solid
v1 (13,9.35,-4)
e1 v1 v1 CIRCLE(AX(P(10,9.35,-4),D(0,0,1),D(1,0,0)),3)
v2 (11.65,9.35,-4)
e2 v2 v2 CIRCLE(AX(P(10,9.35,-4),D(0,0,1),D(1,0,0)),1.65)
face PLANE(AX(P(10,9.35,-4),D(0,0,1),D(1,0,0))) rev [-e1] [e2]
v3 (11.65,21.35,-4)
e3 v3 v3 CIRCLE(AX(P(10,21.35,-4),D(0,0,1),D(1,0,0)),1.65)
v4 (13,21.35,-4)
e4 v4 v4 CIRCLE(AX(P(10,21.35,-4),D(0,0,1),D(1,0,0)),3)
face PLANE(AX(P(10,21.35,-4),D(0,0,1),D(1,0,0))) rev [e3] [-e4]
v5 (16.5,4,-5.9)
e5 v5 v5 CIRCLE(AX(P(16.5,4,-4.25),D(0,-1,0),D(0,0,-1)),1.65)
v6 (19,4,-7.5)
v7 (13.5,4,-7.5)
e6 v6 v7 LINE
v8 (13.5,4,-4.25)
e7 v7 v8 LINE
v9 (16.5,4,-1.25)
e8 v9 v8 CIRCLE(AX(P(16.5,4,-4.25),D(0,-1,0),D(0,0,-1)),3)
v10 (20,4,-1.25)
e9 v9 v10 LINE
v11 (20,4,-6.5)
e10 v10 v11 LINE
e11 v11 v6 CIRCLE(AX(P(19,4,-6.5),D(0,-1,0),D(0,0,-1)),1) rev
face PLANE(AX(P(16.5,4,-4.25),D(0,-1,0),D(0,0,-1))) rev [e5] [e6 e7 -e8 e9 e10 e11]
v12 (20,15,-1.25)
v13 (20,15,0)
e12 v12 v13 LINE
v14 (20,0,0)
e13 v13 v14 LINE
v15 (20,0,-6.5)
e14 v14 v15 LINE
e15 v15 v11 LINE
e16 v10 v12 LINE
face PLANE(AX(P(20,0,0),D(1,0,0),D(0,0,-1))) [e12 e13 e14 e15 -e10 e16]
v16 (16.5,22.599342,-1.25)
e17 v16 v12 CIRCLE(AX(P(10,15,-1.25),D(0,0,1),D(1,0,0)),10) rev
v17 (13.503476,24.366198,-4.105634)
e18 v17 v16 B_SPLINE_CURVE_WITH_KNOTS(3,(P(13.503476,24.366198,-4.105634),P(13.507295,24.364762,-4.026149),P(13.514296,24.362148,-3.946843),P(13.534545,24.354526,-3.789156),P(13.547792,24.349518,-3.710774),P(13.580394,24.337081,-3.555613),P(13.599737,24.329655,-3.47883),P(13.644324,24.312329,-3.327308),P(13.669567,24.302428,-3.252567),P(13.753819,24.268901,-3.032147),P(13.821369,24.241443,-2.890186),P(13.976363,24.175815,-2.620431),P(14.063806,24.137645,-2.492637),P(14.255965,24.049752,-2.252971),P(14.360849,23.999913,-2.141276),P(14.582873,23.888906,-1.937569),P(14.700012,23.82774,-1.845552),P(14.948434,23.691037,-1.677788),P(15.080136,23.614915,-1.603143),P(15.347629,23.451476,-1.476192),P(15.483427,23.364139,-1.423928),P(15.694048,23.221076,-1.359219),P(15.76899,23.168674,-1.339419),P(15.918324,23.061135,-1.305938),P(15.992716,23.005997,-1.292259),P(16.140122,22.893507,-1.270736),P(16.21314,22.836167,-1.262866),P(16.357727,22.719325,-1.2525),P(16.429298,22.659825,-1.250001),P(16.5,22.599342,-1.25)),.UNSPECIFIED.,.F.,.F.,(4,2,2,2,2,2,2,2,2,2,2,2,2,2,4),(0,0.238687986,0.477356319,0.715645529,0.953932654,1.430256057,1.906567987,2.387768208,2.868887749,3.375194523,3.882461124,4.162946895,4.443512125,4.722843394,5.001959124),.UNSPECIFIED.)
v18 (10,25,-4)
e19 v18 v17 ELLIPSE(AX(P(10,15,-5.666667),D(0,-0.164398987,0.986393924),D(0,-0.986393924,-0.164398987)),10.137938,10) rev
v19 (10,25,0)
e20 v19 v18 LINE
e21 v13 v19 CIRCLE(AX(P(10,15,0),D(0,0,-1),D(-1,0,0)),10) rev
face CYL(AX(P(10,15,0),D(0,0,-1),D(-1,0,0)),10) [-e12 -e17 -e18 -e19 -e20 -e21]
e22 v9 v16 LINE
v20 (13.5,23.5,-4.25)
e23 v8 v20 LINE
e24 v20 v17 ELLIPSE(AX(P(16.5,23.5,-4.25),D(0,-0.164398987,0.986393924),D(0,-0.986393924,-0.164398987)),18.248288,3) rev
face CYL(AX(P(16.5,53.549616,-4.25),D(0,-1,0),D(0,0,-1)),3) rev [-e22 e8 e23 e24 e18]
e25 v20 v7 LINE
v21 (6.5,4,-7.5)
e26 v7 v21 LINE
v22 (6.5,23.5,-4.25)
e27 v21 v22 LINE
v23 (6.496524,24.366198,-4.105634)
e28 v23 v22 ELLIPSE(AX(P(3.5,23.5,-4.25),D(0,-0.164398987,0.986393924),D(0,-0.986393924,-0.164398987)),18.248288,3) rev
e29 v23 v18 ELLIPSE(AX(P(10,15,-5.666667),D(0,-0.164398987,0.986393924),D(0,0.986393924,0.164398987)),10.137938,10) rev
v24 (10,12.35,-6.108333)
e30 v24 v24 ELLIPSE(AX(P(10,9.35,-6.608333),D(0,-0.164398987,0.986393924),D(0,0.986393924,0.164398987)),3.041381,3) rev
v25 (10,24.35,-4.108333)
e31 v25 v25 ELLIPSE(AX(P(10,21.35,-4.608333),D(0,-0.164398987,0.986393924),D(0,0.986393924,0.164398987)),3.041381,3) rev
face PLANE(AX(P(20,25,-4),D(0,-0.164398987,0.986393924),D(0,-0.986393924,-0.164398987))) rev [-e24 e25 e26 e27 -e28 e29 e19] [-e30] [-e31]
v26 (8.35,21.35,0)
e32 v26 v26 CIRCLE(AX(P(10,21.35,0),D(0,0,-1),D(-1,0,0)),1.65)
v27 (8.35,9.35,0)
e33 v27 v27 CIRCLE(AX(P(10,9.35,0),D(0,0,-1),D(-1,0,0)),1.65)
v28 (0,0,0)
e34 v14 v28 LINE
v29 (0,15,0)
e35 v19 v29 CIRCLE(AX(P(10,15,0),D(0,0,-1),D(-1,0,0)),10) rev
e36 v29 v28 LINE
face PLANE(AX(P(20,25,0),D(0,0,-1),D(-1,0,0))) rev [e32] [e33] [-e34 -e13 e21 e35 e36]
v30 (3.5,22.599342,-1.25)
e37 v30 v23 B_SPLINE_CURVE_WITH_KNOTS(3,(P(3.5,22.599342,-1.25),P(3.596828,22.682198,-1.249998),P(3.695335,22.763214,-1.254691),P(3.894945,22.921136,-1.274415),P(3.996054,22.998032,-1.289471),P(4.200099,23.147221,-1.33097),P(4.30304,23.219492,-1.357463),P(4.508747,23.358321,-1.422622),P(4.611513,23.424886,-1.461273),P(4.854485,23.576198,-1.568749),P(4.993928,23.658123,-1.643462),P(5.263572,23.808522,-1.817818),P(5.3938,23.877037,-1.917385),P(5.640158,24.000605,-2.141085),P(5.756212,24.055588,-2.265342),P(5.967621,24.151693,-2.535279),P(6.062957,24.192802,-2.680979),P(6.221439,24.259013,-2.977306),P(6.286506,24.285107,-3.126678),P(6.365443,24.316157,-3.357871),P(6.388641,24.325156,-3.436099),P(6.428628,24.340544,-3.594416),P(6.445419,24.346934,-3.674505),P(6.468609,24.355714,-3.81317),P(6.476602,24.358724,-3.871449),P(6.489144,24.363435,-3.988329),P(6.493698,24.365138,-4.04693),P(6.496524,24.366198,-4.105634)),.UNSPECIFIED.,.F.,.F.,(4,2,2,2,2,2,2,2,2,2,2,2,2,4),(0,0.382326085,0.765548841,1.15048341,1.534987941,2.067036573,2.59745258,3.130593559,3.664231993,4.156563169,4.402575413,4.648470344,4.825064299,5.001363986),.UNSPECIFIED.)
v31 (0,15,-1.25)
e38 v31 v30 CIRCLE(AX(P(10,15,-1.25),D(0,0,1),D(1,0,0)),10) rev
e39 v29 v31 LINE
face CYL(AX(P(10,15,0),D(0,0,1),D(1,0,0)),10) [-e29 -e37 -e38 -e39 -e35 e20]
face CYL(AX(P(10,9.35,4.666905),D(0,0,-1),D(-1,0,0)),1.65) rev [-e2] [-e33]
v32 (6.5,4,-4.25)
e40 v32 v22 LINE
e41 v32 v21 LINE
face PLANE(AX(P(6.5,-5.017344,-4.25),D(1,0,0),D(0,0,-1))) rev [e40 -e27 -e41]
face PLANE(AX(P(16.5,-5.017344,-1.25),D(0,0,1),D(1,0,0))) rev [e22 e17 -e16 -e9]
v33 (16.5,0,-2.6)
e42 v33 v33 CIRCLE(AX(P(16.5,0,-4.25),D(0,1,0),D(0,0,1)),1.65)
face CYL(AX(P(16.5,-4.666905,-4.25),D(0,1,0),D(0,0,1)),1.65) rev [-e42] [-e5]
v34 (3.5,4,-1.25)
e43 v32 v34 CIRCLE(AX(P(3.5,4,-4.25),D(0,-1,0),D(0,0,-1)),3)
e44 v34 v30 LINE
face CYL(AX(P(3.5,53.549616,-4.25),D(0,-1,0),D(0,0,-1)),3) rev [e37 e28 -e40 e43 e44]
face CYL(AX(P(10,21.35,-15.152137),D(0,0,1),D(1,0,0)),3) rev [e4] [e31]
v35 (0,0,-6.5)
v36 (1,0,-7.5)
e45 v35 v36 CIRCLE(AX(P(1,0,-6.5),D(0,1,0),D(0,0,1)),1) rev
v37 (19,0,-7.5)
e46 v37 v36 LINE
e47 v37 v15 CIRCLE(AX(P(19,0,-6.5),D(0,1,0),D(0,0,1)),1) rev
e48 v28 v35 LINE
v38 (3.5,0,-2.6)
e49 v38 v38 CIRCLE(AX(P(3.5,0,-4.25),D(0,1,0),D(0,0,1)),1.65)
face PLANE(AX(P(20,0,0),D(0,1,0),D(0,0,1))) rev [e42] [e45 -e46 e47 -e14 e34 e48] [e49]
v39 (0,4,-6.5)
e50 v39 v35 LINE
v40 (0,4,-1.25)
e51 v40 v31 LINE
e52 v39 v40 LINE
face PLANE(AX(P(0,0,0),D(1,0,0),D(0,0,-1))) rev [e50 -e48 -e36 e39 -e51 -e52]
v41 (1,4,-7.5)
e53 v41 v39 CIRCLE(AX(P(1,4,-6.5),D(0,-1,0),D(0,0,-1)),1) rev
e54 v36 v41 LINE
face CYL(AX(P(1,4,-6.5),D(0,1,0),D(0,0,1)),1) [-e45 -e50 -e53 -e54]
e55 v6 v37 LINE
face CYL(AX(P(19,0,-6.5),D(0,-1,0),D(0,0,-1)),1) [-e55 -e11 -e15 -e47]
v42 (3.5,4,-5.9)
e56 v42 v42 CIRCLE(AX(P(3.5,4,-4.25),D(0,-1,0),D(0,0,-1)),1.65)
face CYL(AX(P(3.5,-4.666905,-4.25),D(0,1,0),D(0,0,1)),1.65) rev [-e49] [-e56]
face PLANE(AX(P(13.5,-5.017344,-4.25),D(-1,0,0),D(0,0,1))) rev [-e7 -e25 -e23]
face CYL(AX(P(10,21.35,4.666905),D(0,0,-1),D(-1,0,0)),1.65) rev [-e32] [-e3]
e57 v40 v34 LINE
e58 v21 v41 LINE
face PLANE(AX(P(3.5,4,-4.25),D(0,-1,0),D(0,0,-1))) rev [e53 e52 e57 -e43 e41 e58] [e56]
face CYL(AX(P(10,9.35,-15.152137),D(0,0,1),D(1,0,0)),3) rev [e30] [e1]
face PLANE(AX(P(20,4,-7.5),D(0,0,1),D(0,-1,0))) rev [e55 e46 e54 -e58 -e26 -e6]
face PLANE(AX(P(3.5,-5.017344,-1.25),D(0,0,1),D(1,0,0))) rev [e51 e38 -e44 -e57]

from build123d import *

# Parameters (mm, degrees)
EXTRUDE_1_DEPTH                 = 20
SKETCH_2_R                      = 1.65
CUT_EXTRUDE_1_DEPTH             = 4
CUT_EXTRUDE_1_DIRECTION_2_REACH = 31.954
CUT_EXTRUDE_START               = -21
SKETCH_3_R                      = 3
CUT_EXTRUDE_2_DEPTH             = 21
SKETCH_4_R                      = 1.65
CUT_EXTRUDE_3_DEPTH             = 4
CUT_EXTRUDE_3_DIRECTION_2_REACH = 34.265
CUT_EXTRUDE_7_REACH             = 34.265
SKETCH_5_R                      = 3
CUT_EXTRUDE_8_DEPTH             = 21
FILLET_1_R                      = 10
FILLET_2_R                      = 1


with BuildPart() as part:
    # Эскиз1 → Бобышка-Вытянуть1 (new body)
    with BuildSketch(Plane(origin=(0, 0, 0), x_dir=(0, 0, -1), z_dir=(1, 0, 0))):
        Polygon((0, 0), (7.5, 0), (7.5, 4), (4, 25), (0, 25), align=None)
    extrude(amount=EXTRUDE_1_DEPTH)

    # Эскиз2 → Вырез-Вытянуть1 (cut)
    with BuildSketch(Plane(origin=(0, 4, 0), x_dir=(-1, 0, 0), z_dir=(0, -1, 0))):
        with Locations(Location((-16.5, 4.25, 0), (0, 0, 270))):
            Circle(SKETCH_2_R)
        with Locations(Location((-3.5, 4.25, 0), (0, 0, 270))):
            Circle(SKETCH_2_R)
    extrude(amount=CUT_EXTRUDE_1_DEPTH, mode=Mode.SUBTRACT)

    # Вырез-Вытянуть1 direction 2: up to this plane
    cut_extrude_1_direction_2_end = Plane(origin=(20, 25, -4), z_dir=(0, -0.16439898730535726, 0.9863939238321437))
    # Эскиз2 → Вырез-Вытянуть1 direction 2 (cut, up to the surface)
    with BuildSketch(Plane(origin=(0, 4, 0), x_dir=(-1, 0, 0), z_dir=(0, -1, 0)), mode=Mode.PRIVATE) as cut_extrude_1_direction_2_sk1:
        with Locations(Location((-16.5, 4.25, 0), (0, 0, 270))):
            Circle(SKETCH_2_R)
    cut_extrude_1_direction_2_tool1 = split(extrude(cut_extrude_1_direction_2_sk1.sketch, amount=-CUT_EXTRUDE_1_DIRECTION_2_REACH, mode=Mode.PRIVATE), bisect_by=cut_extrude_1_direction_2_end, keep=Keep.BOTH, mode=Mode.PRIVATE)
    add(cut_extrude_1_direction_2_tool1.solids().sort_by_distance((16.5, 4, -4.25))[0], mode=Mode.SUBTRACT)
    # Эскиз2 → Вырез-Вытянуть1 direction 2 (cut, up to the surface)
    with BuildSketch(Plane(origin=(0, 4, 0), x_dir=(-1, 0, 0), z_dir=(0, -1, 0)), mode=Mode.PRIVATE) as cut_extrude_1_direction_2_sk2:
        with Locations(Location((-3.5, 4.25, 0), (0, 0, 270))):
            Circle(SKETCH_2_R)
    cut_extrude_1_direction_2_tool2 = split(extrude(cut_extrude_1_direction_2_sk2.sketch, amount=-CUT_EXTRUDE_1_DIRECTION_2_REACH, mode=Mode.PRIVATE), bisect_by=cut_extrude_1_direction_2_end, keep=Keep.BOTH, mode=Mode.PRIVATE)
    add(cut_extrude_1_direction_2_tool2.solids().sort_by_distance((3.5, 4, -4.25))[0], mode=Mode.SUBTRACT)

    # Эскиз3 → Вырез-Вытянуть2 (cut)
    with BuildSketch(Plane(origin=(0, 4, 0), x_dir=(-1, 0, 0), z_dir=(0, -1, 0)).offset(CUT_EXTRUDE_START)):
        with Locations(Location((-16.5, 4.25, 0), (0, 0, 90))):
            Circle(SKETCH_3_R)
        with Locations(Location((-3.5, 4.25, 0), (0, 0, 90))):
            Circle(SKETCH_3_R)
    extrude(amount=CUT_EXTRUDE_2_DEPTH, mode=Mode.SUBTRACT)

    # Эскиз4 → Вырез-Вытянуть3 (cut)
    with BuildSketch(Plane.XY.offset(-4)):
        with Locations(Location((10, 21.35, 0), (0, 0, 180))):
            Circle(SKETCH_4_R)
        with Locations(Location((10, 9.35, 0), (0, 0, 180))):
            Circle(SKETCH_4_R)
    extrude(amount=CUT_EXTRUDE_3_DEPTH, mode=Mode.SUBTRACT)

    # Вырез-Вытянуть3 direction 2: up to this plane
    cut_extrude_3_direction_2_end = Plane(origin=(20, 25, -4), z_dir=(0, -0.16439898730535726, 0.9863939238321437))
    # Эскиз4 → Вырез-Вытянуть3 direction 2 (cut, up to the surface)
    with BuildSketch(Plane.XY.offset(-4), mode=Mode.PRIVATE) as cut_extrude_3_direction_2_sk1:
        with Locations(Location((10, 21.35, 0), (0, 0, 180))):
            Circle(SKETCH_4_R)
    cut_extrude_3_direction_2_tool1 = split(extrude(cut_extrude_3_direction_2_sk1.sketch, amount=-CUT_EXTRUDE_3_DIRECTION_2_REACH, mode=Mode.PRIVATE), bisect_by=cut_extrude_3_direction_2_end, keep=Keep.BOTH, mode=Mode.PRIVATE)
    add(cut_extrude_3_direction_2_tool1.solids().sort_by_distance((10, 21.35, -4))[0], mode=Mode.SUBTRACT)
    # Эскиз4 → Вырез-Вытянуть3 direction 2 (cut, up to the surface)
    with BuildSketch(Plane.XY.offset(-4), mode=Mode.PRIVATE) as cut_extrude_3_direction_2_sk2:
        with Locations(Location((10, 9.35, 0), (0, 0, 180))):
            Circle(SKETCH_4_R)
    cut_extrude_3_direction_2_tool2 = split(extrude(cut_extrude_3_direction_2_sk2.sketch, amount=-CUT_EXTRUDE_3_DIRECTION_2_REACH, mode=Mode.PRIVATE), bisect_by=cut_extrude_3_direction_2_end, keep=Keep.BOTH, mode=Mode.PRIVATE)
    add(cut_extrude_3_direction_2_tool2.solids().sort_by_distance((10, 9.35, -4))[0], mode=Mode.SUBTRACT)

    # Вырез-Вытянуть7: up to this plane
    cut_extrude_7_end = Plane(origin=(20, 25, -4), z_dir=(0, -0.16439898730535726, 0.9863939238321437))
    # Эскиз5 → Вырез-Вытянуть7 (cut, up to the surface)
    with BuildSketch(Plane.XY.offset(-4), mode=Mode.PRIVATE) as cut_extrude_7_sk1:
        with Locations((10, 21.35)):
            Circle(SKETCH_5_R)
    cut_extrude_7_tool1 = split(extrude(cut_extrude_7_sk1.sketch, amount=-CUT_EXTRUDE_7_REACH, mode=Mode.PRIVATE), bisect_by=cut_extrude_7_end, keep=Keep.BOTH, mode=Mode.PRIVATE)
    add(cut_extrude_7_tool1.solids().sort_by_distance((10, 21.35, -4))[0], mode=Mode.SUBTRACT)
    # Эскиз5 → Вырез-Вытянуть7 (cut, up to the surface)
    with BuildSketch(Plane.XY.offset(-4), mode=Mode.PRIVATE) as cut_extrude_7_sk2:
        with Locations((10, 9.35)):
            Circle(SKETCH_5_R)
    cut_extrude_7_tool2 = split(extrude(cut_extrude_7_sk2.sketch, amount=-CUT_EXTRUDE_7_REACH, mode=Mode.PRIVATE), bisect_by=cut_extrude_7_end, keep=Keep.BOTH, mode=Mode.PRIVATE)
    add(cut_extrude_7_tool2.solids().sort_by_distance((10, 9.35, -4))[0], mode=Mode.SUBTRACT)

    # Эскиз6 → Вырез-Вытянуть8 (cut)
    with BuildSketch(Plane(origin=(0, 25, 0), x_dir=(1, 0, 0), z_dir=(0, 1, 0))):
        Polygon((0, 7.5), (0, 1.25), (3.5, 1.25), (3.5, 4.25), (6.5, 4.25), (6.5, 7.5), align=None)
        Polygon((13.5, 4.25), (16.5, 4.25), (16.5, 1.25), (20, 1.25), (20, 7.5), (13.5, 7.5), align=None)
    extrude(amount=-CUT_EXTRUDE_8_DEPTH, mode=Mode.SUBTRACT)

    # Скругление1
    fillet_1_edges = [part.edges().sort_by_distance(p)[0] for p in [
        (0, 25, -0.625),
        (20, 25, -0.625),
    ]]
    fillet(fillet_1_edges, radius=FILLET_1_R - 0.0001)  # a hair under: the kernel refuses the full size

    # Скругление2
    fillet_2_edges = [part.edges().sort_by_distance(p)[0] for p in [
        (20, 2, -7.5),
        (0, 2, -7.5),
    ]]
    fillet(fillet_2_edges, radius=FILLET_2_R)


solid = part.part
